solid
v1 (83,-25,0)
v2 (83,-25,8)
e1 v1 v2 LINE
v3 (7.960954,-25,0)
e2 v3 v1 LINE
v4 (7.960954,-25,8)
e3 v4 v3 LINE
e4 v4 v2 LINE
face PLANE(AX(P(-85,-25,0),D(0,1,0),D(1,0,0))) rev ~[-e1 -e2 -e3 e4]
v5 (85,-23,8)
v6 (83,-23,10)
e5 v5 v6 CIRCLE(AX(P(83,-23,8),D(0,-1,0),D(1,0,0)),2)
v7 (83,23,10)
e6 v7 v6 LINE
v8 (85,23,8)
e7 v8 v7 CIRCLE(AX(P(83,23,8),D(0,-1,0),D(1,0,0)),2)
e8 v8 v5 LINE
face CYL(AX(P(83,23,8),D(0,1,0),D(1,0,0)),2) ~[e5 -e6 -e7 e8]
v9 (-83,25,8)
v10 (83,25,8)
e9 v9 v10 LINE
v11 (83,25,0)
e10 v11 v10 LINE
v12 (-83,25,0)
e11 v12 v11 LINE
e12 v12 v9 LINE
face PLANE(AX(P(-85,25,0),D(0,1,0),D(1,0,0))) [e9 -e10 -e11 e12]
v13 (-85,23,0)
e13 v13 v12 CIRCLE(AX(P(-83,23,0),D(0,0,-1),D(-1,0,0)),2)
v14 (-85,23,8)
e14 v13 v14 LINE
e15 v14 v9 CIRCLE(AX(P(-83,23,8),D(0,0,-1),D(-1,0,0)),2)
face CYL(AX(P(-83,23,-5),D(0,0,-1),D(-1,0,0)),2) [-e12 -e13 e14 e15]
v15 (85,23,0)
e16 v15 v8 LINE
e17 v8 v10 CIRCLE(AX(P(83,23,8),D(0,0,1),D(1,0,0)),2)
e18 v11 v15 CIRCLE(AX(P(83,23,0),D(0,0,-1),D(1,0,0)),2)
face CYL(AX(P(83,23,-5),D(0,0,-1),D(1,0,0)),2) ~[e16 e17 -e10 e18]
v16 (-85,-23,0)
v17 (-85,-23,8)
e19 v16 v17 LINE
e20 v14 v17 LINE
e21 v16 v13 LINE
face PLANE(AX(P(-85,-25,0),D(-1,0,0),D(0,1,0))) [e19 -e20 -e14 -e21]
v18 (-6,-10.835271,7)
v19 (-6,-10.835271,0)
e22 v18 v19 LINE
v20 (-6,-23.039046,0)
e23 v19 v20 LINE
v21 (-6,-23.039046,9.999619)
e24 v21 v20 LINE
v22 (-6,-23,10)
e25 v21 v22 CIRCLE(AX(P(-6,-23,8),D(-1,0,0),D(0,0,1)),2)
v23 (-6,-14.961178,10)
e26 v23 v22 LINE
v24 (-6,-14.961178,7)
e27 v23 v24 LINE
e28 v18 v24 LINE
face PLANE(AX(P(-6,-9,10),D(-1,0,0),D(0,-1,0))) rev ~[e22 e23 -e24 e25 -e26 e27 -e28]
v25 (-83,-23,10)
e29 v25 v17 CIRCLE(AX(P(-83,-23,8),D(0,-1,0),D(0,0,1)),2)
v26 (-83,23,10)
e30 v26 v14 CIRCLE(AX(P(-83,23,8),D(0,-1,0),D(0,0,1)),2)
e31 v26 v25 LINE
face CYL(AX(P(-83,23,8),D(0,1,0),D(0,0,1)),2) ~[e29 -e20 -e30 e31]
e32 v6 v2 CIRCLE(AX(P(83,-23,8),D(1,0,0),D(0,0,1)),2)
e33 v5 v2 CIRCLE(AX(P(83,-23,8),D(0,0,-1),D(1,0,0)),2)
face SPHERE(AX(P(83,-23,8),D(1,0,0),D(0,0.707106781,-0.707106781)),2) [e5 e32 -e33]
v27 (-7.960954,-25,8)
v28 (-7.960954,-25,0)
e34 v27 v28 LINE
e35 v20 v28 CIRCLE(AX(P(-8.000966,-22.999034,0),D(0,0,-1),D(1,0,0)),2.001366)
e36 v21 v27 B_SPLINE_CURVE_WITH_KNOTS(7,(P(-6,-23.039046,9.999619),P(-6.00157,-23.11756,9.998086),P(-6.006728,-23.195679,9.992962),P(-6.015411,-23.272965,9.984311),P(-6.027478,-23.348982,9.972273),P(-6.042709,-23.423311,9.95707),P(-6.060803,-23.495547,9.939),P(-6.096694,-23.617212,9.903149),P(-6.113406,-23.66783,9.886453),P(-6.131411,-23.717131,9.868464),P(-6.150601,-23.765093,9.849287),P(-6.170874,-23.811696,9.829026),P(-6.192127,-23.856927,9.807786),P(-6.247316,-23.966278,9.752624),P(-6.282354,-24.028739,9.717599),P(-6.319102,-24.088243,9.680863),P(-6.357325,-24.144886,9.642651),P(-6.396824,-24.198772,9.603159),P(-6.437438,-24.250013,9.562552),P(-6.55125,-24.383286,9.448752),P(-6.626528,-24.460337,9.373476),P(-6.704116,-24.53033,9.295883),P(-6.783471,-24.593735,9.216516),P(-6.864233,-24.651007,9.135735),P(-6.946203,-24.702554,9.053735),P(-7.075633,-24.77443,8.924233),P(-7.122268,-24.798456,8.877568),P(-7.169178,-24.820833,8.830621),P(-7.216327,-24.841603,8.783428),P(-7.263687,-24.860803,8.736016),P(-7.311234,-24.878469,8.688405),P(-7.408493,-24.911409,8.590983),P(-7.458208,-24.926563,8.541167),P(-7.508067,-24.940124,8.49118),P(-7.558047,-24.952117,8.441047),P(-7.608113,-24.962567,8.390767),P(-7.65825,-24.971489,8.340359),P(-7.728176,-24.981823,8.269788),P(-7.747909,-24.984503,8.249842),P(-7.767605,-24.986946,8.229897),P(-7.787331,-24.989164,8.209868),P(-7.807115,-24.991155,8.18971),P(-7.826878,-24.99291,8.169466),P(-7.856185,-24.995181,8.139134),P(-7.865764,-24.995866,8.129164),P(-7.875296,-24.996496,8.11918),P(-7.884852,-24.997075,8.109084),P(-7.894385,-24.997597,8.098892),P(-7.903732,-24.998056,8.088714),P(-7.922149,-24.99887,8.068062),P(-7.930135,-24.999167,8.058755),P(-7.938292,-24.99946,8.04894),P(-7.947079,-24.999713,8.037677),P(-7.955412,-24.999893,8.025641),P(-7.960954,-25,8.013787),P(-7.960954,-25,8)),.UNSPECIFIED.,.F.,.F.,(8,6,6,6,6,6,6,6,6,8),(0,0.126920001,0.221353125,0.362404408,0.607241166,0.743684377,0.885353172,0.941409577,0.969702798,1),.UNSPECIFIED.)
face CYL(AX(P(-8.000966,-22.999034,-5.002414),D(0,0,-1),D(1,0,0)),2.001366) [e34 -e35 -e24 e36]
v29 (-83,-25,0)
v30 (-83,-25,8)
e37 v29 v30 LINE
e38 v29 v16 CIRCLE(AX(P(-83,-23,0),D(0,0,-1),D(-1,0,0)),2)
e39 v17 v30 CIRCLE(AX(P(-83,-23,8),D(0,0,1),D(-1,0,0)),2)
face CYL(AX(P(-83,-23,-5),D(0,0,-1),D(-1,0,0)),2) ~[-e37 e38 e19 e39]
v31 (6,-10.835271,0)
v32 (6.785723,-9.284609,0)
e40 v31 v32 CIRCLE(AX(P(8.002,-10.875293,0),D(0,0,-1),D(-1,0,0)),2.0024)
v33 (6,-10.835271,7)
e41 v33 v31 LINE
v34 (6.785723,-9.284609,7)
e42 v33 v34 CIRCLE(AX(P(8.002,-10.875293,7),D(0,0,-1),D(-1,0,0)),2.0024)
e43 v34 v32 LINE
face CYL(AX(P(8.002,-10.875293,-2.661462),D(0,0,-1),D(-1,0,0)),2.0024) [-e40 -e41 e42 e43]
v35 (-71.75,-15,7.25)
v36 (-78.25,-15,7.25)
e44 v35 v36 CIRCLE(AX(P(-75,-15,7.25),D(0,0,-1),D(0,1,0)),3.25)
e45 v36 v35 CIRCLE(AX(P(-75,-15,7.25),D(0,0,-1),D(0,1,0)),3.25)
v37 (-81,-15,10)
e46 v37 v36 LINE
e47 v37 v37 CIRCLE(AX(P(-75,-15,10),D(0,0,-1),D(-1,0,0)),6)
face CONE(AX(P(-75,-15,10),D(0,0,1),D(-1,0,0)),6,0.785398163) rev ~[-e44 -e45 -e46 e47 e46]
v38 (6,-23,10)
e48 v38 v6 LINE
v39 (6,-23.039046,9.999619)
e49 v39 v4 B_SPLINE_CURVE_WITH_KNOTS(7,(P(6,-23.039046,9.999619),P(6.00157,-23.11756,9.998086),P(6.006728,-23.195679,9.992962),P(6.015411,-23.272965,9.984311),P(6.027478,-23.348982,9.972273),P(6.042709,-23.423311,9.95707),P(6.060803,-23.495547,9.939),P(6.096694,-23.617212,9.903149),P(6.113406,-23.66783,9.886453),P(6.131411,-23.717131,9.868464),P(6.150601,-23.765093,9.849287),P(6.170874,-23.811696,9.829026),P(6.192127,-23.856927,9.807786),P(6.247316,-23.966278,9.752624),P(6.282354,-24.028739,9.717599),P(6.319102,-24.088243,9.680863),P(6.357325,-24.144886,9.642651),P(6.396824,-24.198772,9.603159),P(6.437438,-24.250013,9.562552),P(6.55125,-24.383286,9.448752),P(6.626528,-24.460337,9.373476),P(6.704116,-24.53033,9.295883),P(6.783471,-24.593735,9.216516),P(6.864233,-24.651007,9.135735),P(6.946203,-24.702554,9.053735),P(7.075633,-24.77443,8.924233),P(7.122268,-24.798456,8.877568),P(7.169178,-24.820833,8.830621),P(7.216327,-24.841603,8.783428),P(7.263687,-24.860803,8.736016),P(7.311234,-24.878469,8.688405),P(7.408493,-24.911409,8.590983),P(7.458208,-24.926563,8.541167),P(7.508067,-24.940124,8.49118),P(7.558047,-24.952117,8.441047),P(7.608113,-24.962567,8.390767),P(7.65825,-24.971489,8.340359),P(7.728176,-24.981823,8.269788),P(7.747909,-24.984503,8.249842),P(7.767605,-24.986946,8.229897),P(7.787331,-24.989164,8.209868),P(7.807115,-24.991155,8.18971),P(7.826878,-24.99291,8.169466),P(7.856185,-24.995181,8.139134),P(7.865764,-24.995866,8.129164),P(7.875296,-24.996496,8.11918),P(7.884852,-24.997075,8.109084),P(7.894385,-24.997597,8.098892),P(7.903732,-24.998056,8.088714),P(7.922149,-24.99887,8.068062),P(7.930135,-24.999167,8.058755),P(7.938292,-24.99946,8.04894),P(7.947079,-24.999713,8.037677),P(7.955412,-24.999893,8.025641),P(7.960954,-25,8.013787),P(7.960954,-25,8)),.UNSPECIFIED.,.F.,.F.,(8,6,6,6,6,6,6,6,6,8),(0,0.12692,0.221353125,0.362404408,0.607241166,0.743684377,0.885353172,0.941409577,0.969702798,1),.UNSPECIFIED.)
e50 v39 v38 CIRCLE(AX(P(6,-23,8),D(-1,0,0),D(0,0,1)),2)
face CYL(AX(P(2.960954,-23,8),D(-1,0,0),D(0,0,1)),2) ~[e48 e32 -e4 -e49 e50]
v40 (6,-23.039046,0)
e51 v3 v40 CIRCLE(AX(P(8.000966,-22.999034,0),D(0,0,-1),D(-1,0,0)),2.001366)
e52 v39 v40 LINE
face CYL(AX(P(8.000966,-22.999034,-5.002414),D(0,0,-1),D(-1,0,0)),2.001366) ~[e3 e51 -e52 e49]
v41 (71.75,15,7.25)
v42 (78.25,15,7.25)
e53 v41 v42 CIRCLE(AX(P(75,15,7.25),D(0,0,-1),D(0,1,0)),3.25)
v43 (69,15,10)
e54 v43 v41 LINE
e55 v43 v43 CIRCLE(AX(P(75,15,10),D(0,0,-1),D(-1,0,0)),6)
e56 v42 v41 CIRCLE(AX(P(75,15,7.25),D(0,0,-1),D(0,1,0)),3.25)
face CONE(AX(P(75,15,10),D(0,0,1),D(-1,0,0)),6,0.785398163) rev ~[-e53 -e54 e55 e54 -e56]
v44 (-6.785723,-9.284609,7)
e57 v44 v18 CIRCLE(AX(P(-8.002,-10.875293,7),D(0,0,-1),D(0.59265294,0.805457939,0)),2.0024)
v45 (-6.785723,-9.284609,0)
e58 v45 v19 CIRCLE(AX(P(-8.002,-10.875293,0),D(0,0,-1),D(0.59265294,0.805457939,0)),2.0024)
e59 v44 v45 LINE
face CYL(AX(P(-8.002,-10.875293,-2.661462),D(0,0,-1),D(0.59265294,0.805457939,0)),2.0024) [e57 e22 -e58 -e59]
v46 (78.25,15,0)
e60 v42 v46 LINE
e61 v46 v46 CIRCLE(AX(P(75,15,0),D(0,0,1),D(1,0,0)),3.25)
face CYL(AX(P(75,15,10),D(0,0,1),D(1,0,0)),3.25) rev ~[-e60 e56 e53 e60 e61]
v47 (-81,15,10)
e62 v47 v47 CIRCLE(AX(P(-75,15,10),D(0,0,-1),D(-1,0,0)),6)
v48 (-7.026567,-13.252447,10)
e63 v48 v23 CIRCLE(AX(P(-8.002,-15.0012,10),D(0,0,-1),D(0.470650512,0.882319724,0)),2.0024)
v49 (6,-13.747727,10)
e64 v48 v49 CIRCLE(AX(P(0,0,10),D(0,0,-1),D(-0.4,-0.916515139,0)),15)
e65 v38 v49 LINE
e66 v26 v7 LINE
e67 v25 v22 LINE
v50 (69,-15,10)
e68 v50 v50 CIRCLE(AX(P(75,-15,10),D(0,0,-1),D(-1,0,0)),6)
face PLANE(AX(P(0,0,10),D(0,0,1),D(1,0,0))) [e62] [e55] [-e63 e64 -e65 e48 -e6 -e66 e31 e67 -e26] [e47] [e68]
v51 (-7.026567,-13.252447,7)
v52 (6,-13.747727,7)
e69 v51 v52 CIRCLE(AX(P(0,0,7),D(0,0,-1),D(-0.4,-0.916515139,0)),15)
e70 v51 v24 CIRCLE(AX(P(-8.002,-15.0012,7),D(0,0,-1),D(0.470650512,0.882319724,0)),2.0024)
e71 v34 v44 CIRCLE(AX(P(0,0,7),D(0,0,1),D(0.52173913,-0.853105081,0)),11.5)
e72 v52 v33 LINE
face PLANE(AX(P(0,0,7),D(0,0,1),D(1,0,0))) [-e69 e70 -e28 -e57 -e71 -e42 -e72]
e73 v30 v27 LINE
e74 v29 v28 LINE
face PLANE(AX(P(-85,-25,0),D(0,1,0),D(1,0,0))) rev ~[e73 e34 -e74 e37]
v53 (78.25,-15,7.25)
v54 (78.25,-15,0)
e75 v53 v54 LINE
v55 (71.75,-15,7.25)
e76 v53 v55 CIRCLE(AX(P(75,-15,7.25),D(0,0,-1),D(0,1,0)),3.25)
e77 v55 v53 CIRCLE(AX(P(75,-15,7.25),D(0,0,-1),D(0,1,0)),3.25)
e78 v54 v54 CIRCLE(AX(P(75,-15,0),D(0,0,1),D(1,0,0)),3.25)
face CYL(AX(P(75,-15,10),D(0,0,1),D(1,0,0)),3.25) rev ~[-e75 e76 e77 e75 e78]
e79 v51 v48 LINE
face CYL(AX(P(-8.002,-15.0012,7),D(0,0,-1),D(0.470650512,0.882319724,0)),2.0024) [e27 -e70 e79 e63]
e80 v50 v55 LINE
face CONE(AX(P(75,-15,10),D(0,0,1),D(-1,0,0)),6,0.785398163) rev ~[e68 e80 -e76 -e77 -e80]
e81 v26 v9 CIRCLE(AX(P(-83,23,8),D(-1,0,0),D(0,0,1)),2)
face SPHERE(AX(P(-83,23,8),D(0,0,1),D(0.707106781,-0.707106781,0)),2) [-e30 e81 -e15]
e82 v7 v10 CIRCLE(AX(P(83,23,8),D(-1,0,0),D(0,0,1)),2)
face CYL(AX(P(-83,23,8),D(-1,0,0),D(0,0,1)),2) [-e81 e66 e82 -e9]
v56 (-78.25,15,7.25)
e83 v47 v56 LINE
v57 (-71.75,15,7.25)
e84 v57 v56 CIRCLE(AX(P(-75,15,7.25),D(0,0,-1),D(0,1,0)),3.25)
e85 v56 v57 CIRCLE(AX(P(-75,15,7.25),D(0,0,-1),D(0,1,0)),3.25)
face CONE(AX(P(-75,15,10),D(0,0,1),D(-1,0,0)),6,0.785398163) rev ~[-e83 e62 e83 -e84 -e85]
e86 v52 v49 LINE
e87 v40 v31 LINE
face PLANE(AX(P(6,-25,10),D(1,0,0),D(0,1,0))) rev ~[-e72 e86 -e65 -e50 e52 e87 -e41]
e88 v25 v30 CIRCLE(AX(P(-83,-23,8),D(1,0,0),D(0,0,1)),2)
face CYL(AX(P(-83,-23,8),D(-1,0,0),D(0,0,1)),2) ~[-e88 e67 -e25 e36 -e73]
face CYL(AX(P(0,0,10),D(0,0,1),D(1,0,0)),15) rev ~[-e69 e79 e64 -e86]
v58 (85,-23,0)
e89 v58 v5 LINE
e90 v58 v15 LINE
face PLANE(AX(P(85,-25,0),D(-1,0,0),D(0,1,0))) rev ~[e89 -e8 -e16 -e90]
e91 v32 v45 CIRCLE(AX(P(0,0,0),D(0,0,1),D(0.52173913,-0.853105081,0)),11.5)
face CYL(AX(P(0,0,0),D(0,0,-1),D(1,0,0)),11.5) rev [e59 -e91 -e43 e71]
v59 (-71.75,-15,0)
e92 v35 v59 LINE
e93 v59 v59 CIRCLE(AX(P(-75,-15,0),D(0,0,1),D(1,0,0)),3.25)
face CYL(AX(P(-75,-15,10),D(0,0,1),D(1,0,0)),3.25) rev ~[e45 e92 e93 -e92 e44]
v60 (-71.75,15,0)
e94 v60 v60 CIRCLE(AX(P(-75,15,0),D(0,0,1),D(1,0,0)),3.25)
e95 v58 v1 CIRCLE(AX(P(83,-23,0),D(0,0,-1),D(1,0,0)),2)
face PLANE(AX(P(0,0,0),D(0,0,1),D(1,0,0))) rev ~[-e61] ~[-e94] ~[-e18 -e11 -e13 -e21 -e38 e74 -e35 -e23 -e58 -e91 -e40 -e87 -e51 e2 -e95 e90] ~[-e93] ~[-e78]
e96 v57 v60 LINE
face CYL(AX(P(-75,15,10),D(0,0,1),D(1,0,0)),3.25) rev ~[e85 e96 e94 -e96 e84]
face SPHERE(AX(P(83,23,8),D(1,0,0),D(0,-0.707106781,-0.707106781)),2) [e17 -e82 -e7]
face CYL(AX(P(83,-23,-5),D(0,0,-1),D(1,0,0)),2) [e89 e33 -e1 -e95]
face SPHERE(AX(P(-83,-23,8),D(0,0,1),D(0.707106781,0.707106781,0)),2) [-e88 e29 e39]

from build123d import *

# Parameters (mm, degrees)
F0_W            = 170
F0_H            = 50
F0_R            = 11.5
F1_DEPTH        = 10
F2_R            = 3.25
F3_DEPTH        = 10.001
F4_R            = 15
F4_R_2          = 11.5
F5_DEPTH        = 3
F7_DEPTH        = 25
F8_T1_DEPTH     = 20.004828627
F8_T3_DEPTH     = 12.3229236974
F8_T5_DEPTH     = 6.1336823274
F9_T1_DEPTH     = 46
F9_T3_DEPTH     = 166
F9_T5_DEPTH     = 13
F9_T7_DEPTH     = 80.0390459698
F9_T9_DEPTH     = 80.0390459698
F9_S13_W        = 2
F9_S13_H        = 2
F9_T14_DEPTH    = 2
F9_S19_W        = 2
F9_S19_H        = 2
F9_T20_DEPTH    = 2
F9_S25_W        = 2
F9_S25_H        = 2
F9_T26_DEPTH    = 2
F9_S31_W        = 2
F9_S31_H        = 2
F9_T32_DEPTH    = 2
F11_D           = 6.5
F11_DEPTH       = 15
F11_CSINK_D     = 12
F11_CSINK_ANGLE = 90
F11_TIP         = 1.9527970118


# Not quite as in the source:
# - a fillet or chamfer that OpenCascade refuses, or shapes differently, is made with other operations: its cross-section is extruded or revolved along the edge and cut away or added


with BuildPart() as f1:
    # F0 (on Top) → F1 (new body)
    with BuildSketch(Plane.XY):
        Rectangle(F0_W, F0_H)
        Circle(F0_R, mode=Mode.SUBTRACT)
    extrude(amount=F1_DEPTH)

    # F2 (on face) → F3 (cut, through all)
    with BuildSketch(Plane.XY.offset(10)):
        with Locations((-75, 15)):
            Circle(F2_R)
        with Locations((-75, -15)):
            Circle(F2_R)
        with Locations((75, -15)):
            Circle(F2_R)
        with Locations((75, 15)):
            Circle(F2_R)
    extrude(amount=-F3_DEPTH, mode=Mode.SUBTRACT)

    # F4 (on face) → F5 (cut)
    with BuildSketch(Plane.XY.offset(10)):
        Circle(F4_R)
        Circle(F4_R_2, mode=Mode.SUBTRACT)
    extrude(amount=-F5_DEPTH, mode=Mode.SUBTRACT)

    # F6 (on face) → F7 (cut)
    with BuildSketch(Plane.XY.offset(10)):
        with BuildLine():
            Line((-6, -13.7477270849), (-6, -25))
            Line((-6, -25), (6, -25))
            Line((6, -25), (6, -13.7477270849))
            ThreePointArc((6, -13.7477270849), (0, -15), (-6, -13.7477270849))
        make_face()
        with BuildLine():
            Line((-6, -9), (-6, -13.7477270849))
            ThreePointArc((-6, -13.7477270849), (0, -15), (6, -13.7477270849))
            Line((6, -13.7477270849), (6, -9))
            Line((6, -9), (-6, -9))
        make_face()
    extrude(amount=-F7_DEPTH, mode=Mode.SUBTRACT)

    # F8: fillet of radius 2 on 5 edges, made by hand

    # F8_s2 → F8_t1 (cut)
    with BuildSketch(Plane.XY.offset(-5.0024143135)):
        with BuildLine():
            ThreePointArc((-5.9996, -22.9990343146), (-6.5857864376, -24.4142135624), (-8.0009656854, -25.0004))
            Line((-8.0009656854, -25.0004), (-8.0009656854, -25.2005365685))
            ThreePointArc((-8.0009656854, -25.2005365685), (-7.0004828427, -25.2001365685), (-6, -25.2001365685))
            Line((-6, -25.2001365685), (-5.7998634315, -25))
            ThreePointArc((-5.7998634315, -25), (-5.7998634315, -23.9995171573), (-5.7994634315, -22.9990343146))
            Line((-5.7994634315, -22.9990343146), (-5.9996, -22.9990343146))
        make_face()
        with BuildLine():
            ThreePointArc((5.9996, -22.9990343146), (6.5857864376, -24.4142135624), (8.0009656854, -25.0004))
            Line((8.0009656854, -25.0004), (8.0009656854, -25.2005365685))
            ThreePointArc((8.0009656854, -25.2005365685), (7.0004828427, -25.2001365685), (6, -25.2001365685))
            Line((6, -25.2001365685), (5.7998634315, -25))
            ThreePointArc((5.7998634315, -25), (5.7998634315, -23.9995171573), (5.7994634315, -22.9990343146))
            Line((5.7994634315, -22.9990343146), (5.9996, -22.9990343146))
        make_face()
    extrude(amount=F8_T1_DEPTH, mode=Mode.SUBTRACT)

    # F8_s4 → F8_t3 (cut)
    with BuildSketch(Plane.XY.offset(-2.6614618487)):
        with BuildLine():
            ThreePointArc((-6.8152717523, -9.2624441214), (-6.215115784, -9.9716058978), (-5.9996, -10.8752930995))
            Line((-5.9996, -10.8752930995), (-5.79936, -10.8752930995))
            ThreePointArc((-5.79936, -10.8752930995), (-5.79976, -10.3430007673), (-5.79976, -9.8107084352))
            Line((-5.79976, -9.8107084352), (-5.8955269565, -9.6398826737))
            ThreePointArc((-5.8955269565, -9.6398826737), (-6.3019268651, -9.3792480426), (-6.6965989276, -9.1011592236))
            Line((-6.6965989276, -9.1011592236), (-6.8152717523, -9.2624441214))
        make_face()
        with BuildLine():
            ThreePointArc((5.9996, -10.8752930995), (6.215115784, -9.9716058978), (6.8152717523, -9.2624441214))
            Line((6.8152717523, -9.2624441214), (6.6965989276, -9.1011592236))
            ThreePointArc((6.6965989276, -9.1011592236), (6.3019268651, -9.3792480426), (5.8955269565, -9.6398826737))
            Line((5.8955269565, -9.6398826737), (5.79976, -9.8107084352))
            ThreePointArc((5.79976, -9.8107084352), (5.79976, -10.3430007673), (5.79936, -10.8752930995))
            Line((5.79936, -10.8752930995), (5.9996, -10.8752930995))
        make_face()
    extrude(amount=F8_T3_DEPTH, mode=Mode.SUBTRACT)

    # F8_s6 → F8_t5 (cut)
    with BuildSketch(Plane.XY.offset(7)):
        with BuildLine():
            ThreePointArc((-7.0595694154, -13.2344429361), (-6.2849198093, -13.9710342475), (-5.9996, -15.001199952))
            Line((-5.9996, -15.001199952), (-5.79936, -15.001199952))
            ThreePointArc((-5.79936, -15.001199952), (-5.79976, -14.3744635184), (-5.79976, -13.7477270849))
            Line((-5.79976, -13.7477270849), (-5.919904, -13.5642040934))
            ThreePointArc((-5.919904, -13.5642040934), (-6.4476696186, -13.3214283223), (-6.9653263569, -13.0577672345))
            Line((-6.9653263569, -13.0577672345), (-7.0595694154, -13.2344429361))
        make_face()
    extrude(amount=F8_T5_DEPTH, mode=Mode.SUBTRACT)

    # F9: fillet of radius 2 on 9 edges, made by hand

    # F9_s2 → F9_t1 (cut)
    with BuildSketch(Plane.XZ.offset(-23)):
        with BuildLine():
            ThreePointArc((-83, 10), (-84.4142135624, 9.4142135624), (-85, 8))
            Line((-85, 8), (-85, 10))
            Line((-85, 10), (-83, 10))
        make_face()
        with BuildLine():
            ThreePointArc((85, 8), (84.4142135624, 9.4142135624), (83, 10))
            Line((83, 10), (85, 10))
            Line((85, 10), (85, 8))
        make_face()
    extrude(amount=F9_T1_DEPTH, mode=Mode.SUBTRACT)

    # F9_s4 → F9_t3 (cut)
    with BuildSketch(Plane.YZ.offset(-83)):
        with BuildLine():
            ThreePointArc((23, 10), (24.4142135624, 9.4142135624), (25, 8))
            Line((25, 8), (25, 10))
            Line((25, 10), (23, 10))
        make_face()
    extrude(amount=F9_T3_DEPTH, mode=Mode.SUBTRACT)

    # F9_s6 → F9_t5 (cut)
    with BuildSketch(Plane.XY.offset(-5)):
        with BuildLine():
            ThreePointArc((85, -23), (84.4142135624, -24.4142135624), (83, -25))
            Line((83, -25), (85, -25))
            Line((85, -25), (85, -23))
        make_face()
        with BuildLine():
            ThreePointArc((85, 23), (84.4142135624, 24.4142135624), (83, 25))
            Line((83, 25), (85, 25))
            Line((85, 25), (85, 23))
        make_face()
        with BuildLine():
            ThreePointArc((-85, -23), (-84.4142135624, -24.4142135624), (-83, -25))
            Line((-83, -25), (-85, -25))
            Line((-85, -25), (-85, -23))
        make_face()
        with BuildLine():
            ThreePointArc((-85, 23), (-84.4142135624, 24.4142135624), (-83, 25))
            Line((-83, 25), (-85, 25))
            Line((-85, 25), (-85, 23))
        make_face()
    extrude(amount=F9_T5_DEPTH, mode=Mode.SUBTRACT)

    # F9_s8 → F9_t7 (cut)
    with BuildSketch(Plane.YZ.offset(2.9609540302)):
        with BuildLine():
            ThreePointArc((-23, 10), (-24.4142135624, 9.4142135624), (-25, 8))
            Line((-25, 8), (-25, 10))
            Line((-25, 10), (-23, 10))
        make_face()
    extrude(amount=F9_T7_DEPTH, mode=Mode.SUBTRACT)

    # F9_s10 → F9_t9 (cut)
    with BuildSketch(Plane.YZ.offset(-83)):
        with BuildLine():
            ThreePointArc((-23, 10), (-24.4142135624, 9.4142135624), (-25, 8))
            Line((-25, 8), (-25, 10))
            Line((-25, 10), (-23, 10))
        make_face()
    extrude(amount=F9_T9_DEPTH, mode=Mode.SUBTRACT)


with BuildPart() as f9_tool12:
    # F9_s13 → F9_t14 (new body)
    with BuildSketch(Plane.XY.offset(8)):
        with Locations((-84, 24)):
            Rectangle(F9_S13_W, F9_S13_H)
    extrude(amount=F9_T14_DEPTH)

    # F9_s15 → F9_t16 (revolve, cut)
    with BuildSketch(Plane(origin=(-83, 23, 8), x_dir=(0.7071067812, -0.7071067812, 0), z_dir=(-0.7071067812, -0.7071067812, 0))):
        with BuildLine():
            ThreePointArc((0, -2), (2, 0), (0, 2))
            Line((0, 2), (0, -2))
        make_face()
    revolve(axis=Axis((-83, 23, 8), (0, 0, 1)), mode=Mode.SUBTRACT)


with BuildPart() as f1_1:
    add(f1.part)

    # F9_t11: cut F9_tool12
    add(f9_tool12.part, mode=Mode.SUBTRACT)


with BuildPart() as f9_tool18:
    # F9_s19 → F9_t20 (new body)
    with BuildSketch(Plane.XY.offset(8)):
        with Locations((-84, -24)):
            Rectangle(F9_S19_W, F9_S19_H)
    extrude(amount=F9_T20_DEPTH)

    # F9_s21 → F9_t22 (revolve, cut)
    with BuildSketch(Plane(origin=(-83, -23, 8), x_dir=(0.7071067812, 0.7071067812, 0), z_dir=(0.7071067812, -0.7071067812, 0))):
        with BuildLine():
            ThreePointArc((0, -2), (2, 0), (0, 2))
            Line((0, 2), (0, -2))
        make_face()
    revolve(axis=Axis((-83, -23, 8), (0, 0, 1)), mode=Mode.SUBTRACT)


with BuildPart() as f1_2:
    add(f1_1.part)

    # F9_t17: cut F9_tool18
    add(f9_tool18.part, mode=Mode.SUBTRACT)


with BuildPart() as f9_tool24:
    # F9_s25 → F9_t26 (new body)
    with BuildSketch(Plane.YZ.offset(83)):
        with Locations((24, 9)):
            Rectangle(F9_S25_W, F9_S25_H)
    extrude(amount=F9_T26_DEPTH)

    # F9_s27 → F9_t28 (revolve, cut)
    with BuildSketch(Plane(origin=(83, 23, 8), x_dir=(0, -0.7071067812, -0.7071067812), z_dir=(0, -0.7071067812, 0.7071067812))):
        with BuildLine():
            ThreePointArc((0, -2), (2, 0), (0, 2))
            Line((0, 2), (0, -2))
        make_face()
    revolve(axis=Axis((83, 23, 8), (1, 0, 0)), mode=Mode.SUBTRACT)


with BuildPart() as f1_3:
    add(f1_2.part)

    # F9_t23: cut F9_tool24
    add(f9_tool24.part, mode=Mode.SUBTRACT)


with BuildPart() as f9_tool30:
    # F9_s31 → F9_t32 (new body)
    with BuildSketch(Plane.YZ.offset(83)):
        with Locations((-24, 9)):
            Rectangle(F9_S31_W, F9_S31_H)
    extrude(amount=F9_T32_DEPTH)

    # F9_s33 → F9_t34 (revolve, cut)
    with BuildSketch(Plane(origin=(83, -23, 8), x_dir=(0, 0.7071067812, -0.7071067812), z_dir=(0, -0.7071067812, -0.7071067812))):
        with BuildLine():
            ThreePointArc((0, -2), (2, 0), (0, 2))
            Line((0, 2), (0, -2))
        make_face()
    revolve(axis=Axis((83, -23, 8), (1, 0, 0)), mode=Mode.SUBTRACT)


with BuildPart() as f1_4:
    add(f1_3.part)

    # F9_t29: cut F9_tool30
    add(f9_tool30.part, mode=Mode.SUBTRACT)

    # F11
    with Locations(Plane.XY.offset(10)):
        with Locations((-75, 15), (-75, -15), (75, -15), (75, 15)):
            CounterSinkHole(F11_D / 2, F11_CSINK_D / 2, depth=F11_DEPTH, counter_sink_angle=F11_CSINK_ANGLE)
            with Locations((0, 0, -(F11_DEPTH + F11_TIP / 2))):  # 118° drill point
                Cone(0, F11_D / 2, F11_TIP, mode=Mode.SUBTRACT)


solid = f1_4.part
